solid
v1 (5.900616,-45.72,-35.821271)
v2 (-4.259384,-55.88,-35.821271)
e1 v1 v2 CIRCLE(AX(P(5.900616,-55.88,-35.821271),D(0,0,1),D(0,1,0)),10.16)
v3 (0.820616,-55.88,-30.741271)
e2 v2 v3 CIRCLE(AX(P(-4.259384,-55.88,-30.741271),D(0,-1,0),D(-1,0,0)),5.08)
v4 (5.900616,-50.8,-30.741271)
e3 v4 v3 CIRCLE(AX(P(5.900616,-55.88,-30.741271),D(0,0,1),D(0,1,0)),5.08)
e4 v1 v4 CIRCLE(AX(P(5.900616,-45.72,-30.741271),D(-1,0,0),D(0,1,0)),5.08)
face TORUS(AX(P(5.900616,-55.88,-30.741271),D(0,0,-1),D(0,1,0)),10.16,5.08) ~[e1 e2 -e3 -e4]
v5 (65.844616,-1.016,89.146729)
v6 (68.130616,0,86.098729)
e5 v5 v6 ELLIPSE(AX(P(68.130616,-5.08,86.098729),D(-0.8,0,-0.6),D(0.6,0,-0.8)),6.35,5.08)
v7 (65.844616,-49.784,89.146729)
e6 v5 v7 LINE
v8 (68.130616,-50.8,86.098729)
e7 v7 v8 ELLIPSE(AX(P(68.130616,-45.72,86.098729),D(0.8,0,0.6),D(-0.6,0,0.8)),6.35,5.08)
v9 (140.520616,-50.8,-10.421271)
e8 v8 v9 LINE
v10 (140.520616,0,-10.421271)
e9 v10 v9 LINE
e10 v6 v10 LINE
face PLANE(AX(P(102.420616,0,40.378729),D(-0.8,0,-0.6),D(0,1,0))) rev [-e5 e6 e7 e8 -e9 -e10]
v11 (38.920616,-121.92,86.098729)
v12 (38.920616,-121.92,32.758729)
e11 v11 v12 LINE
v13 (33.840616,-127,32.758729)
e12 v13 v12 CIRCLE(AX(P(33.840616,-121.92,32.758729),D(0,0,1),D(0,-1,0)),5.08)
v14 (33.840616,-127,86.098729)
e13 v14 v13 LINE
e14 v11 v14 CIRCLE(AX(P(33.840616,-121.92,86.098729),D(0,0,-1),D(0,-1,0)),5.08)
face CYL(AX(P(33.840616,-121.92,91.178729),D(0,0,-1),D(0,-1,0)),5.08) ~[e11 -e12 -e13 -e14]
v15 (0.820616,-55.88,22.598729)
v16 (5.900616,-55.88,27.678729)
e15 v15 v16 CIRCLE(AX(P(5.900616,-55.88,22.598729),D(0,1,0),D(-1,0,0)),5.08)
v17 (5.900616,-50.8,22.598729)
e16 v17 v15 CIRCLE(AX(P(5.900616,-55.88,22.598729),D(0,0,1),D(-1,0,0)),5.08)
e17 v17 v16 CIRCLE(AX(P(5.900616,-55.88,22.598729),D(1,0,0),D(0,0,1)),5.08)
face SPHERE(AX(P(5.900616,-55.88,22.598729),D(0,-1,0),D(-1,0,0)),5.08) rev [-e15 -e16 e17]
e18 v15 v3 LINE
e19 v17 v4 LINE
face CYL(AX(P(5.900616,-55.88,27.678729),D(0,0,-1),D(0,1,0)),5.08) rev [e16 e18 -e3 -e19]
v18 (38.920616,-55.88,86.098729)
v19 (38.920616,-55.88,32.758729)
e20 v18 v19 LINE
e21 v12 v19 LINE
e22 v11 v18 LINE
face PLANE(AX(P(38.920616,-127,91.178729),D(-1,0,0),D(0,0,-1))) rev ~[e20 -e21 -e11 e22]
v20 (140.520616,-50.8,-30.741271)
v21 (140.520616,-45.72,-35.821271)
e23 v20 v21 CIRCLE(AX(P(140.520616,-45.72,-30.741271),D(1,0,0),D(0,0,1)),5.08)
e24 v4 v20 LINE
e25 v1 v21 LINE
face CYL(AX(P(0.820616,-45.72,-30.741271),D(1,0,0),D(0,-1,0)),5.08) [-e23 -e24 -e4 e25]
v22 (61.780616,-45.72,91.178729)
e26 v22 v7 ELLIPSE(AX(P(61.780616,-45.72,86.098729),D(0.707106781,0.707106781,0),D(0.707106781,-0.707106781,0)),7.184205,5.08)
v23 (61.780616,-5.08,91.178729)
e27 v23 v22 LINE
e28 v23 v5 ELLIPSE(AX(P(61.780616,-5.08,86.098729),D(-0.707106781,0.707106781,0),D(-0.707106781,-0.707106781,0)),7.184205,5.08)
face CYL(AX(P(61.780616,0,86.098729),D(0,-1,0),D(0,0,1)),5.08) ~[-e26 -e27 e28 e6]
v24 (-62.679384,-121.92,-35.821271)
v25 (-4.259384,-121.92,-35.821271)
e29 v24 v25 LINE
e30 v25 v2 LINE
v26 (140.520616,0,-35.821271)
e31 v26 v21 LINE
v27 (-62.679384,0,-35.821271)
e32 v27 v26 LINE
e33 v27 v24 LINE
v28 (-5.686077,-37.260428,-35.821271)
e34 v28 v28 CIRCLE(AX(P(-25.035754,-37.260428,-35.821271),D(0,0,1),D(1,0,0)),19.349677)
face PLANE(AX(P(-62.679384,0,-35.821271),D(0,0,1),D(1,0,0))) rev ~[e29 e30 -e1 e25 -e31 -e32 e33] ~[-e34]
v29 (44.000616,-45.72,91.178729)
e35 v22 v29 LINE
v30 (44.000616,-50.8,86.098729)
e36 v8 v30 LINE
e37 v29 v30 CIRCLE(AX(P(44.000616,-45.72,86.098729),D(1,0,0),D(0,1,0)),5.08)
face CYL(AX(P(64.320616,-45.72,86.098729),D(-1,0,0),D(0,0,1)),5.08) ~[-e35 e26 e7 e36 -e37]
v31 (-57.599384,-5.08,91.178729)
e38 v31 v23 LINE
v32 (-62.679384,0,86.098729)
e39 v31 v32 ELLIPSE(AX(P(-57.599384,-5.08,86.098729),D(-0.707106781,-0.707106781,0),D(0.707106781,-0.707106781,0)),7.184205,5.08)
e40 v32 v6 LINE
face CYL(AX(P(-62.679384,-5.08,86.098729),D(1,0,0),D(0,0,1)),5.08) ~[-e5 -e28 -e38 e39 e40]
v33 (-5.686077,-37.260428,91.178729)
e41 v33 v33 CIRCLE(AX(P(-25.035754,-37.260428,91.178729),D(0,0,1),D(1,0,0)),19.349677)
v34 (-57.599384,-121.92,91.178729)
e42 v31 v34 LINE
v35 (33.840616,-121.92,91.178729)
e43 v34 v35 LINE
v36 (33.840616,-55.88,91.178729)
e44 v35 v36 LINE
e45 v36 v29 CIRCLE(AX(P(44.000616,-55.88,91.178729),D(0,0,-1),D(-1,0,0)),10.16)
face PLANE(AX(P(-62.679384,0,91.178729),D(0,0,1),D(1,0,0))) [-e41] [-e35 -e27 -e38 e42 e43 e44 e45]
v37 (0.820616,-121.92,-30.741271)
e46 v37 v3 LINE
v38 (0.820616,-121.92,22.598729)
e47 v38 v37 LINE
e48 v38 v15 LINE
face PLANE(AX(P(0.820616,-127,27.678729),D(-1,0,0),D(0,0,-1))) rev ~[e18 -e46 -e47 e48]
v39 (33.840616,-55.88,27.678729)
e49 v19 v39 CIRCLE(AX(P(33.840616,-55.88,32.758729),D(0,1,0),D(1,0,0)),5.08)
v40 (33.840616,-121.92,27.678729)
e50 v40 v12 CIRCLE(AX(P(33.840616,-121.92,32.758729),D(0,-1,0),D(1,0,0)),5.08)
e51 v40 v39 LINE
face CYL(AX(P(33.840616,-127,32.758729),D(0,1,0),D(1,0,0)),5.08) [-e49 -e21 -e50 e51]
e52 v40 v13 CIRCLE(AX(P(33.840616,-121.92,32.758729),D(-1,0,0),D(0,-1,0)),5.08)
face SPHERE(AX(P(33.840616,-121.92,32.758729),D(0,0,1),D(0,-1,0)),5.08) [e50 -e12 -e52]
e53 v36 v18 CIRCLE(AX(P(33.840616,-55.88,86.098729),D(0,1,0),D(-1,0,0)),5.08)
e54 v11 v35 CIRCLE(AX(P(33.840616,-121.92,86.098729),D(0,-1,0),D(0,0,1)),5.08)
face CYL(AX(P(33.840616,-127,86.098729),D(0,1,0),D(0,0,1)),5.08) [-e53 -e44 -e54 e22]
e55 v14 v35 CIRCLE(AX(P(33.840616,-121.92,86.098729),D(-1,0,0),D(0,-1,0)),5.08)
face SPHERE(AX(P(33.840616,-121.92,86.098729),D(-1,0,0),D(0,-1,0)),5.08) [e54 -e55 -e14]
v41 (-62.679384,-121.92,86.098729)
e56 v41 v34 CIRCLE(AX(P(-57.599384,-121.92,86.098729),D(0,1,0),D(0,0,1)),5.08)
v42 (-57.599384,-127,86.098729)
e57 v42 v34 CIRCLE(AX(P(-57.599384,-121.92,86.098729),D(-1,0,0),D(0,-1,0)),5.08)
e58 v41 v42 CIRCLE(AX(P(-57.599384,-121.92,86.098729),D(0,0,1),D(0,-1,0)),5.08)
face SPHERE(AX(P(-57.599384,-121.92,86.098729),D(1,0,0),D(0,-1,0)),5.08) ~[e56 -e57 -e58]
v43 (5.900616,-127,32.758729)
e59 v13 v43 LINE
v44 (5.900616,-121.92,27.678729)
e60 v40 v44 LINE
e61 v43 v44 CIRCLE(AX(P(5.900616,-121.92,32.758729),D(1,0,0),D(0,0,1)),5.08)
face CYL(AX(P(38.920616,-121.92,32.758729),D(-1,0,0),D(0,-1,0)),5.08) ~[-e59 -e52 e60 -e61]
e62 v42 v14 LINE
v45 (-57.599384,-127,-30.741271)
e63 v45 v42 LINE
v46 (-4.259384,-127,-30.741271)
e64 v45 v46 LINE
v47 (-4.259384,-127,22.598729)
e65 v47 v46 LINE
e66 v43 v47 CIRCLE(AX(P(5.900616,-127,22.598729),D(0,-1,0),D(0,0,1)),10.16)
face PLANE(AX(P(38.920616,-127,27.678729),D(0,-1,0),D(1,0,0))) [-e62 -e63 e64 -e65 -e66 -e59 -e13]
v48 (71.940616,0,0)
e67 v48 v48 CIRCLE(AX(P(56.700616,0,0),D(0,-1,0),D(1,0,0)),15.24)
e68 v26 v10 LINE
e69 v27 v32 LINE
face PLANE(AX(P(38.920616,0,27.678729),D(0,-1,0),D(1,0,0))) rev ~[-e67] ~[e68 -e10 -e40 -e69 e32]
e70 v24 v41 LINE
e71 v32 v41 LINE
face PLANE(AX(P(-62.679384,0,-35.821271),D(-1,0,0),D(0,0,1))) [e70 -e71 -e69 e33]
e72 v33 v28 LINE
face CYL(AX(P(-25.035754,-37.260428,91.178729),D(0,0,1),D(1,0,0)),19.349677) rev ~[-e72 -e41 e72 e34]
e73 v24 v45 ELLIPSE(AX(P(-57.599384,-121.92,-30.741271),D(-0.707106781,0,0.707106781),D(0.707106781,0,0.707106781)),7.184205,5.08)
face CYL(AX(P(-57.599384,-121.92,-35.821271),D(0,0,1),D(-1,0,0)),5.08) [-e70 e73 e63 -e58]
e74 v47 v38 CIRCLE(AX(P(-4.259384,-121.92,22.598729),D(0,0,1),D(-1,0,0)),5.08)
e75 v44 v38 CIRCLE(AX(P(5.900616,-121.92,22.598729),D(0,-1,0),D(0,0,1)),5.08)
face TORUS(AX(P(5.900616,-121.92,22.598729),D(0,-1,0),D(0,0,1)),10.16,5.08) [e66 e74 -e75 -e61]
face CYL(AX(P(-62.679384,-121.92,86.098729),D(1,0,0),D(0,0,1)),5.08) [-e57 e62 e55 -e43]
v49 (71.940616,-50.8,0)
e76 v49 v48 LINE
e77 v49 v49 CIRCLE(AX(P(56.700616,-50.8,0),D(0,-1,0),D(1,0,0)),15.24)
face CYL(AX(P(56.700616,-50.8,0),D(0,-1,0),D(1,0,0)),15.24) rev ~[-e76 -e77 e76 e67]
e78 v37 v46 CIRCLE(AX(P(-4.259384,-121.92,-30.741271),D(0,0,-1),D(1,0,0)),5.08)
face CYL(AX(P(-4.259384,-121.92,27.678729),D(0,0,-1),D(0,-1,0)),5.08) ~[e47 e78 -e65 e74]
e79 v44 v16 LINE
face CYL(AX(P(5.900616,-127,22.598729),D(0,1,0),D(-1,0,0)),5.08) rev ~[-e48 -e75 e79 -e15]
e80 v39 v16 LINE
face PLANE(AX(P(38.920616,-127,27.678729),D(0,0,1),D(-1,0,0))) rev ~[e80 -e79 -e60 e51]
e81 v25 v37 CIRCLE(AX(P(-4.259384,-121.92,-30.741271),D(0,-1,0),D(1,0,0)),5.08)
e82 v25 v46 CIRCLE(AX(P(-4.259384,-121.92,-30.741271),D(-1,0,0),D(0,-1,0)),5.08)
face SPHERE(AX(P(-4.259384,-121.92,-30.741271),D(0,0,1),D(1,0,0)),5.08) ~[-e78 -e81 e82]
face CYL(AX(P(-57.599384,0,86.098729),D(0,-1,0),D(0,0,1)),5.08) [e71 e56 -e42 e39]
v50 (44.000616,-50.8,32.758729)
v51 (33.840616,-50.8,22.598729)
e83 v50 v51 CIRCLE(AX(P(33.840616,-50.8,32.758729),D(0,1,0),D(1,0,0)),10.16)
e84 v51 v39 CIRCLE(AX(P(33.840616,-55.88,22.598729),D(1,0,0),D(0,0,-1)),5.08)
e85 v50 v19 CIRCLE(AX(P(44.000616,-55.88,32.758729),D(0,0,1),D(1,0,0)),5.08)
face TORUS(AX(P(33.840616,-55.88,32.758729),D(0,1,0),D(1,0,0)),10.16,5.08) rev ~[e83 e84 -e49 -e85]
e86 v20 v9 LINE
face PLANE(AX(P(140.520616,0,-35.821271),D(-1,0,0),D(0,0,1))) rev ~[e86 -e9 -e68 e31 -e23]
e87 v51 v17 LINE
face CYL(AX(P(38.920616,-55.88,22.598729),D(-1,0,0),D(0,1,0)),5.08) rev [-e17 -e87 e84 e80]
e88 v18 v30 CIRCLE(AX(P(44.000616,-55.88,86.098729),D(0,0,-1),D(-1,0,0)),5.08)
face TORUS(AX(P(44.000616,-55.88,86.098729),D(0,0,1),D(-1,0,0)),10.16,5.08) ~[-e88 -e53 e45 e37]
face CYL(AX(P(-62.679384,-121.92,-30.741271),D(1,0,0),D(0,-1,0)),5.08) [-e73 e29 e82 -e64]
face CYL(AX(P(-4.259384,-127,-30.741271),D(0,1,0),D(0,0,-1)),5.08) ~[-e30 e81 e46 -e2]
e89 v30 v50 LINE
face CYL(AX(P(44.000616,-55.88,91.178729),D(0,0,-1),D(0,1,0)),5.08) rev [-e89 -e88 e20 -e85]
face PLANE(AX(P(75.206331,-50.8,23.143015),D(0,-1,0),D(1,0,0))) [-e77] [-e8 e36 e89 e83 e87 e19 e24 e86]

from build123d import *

# Parameters (mm, degrees)
F0_W     = 203.2
F0_H     = 127
F1_DEPTH = 127
F3_DEPTH = 76.2
F4_SIZE2 = 101.6
F4_SIZE  = 76.2
F5_R     = 5.08
F6_R     = 15.24
F7_DEPTH = 50.8
F8_R     = 19.349676851
F9_DEPTH = 127


with BuildPart() as f1:
    # F0 (on Front) → F1 (new body)
    with BuildSketch(Plane.XZ):
        with Locations((38.9206162602, 27.6787289854)):
            Rectangle(F0_W, F0_H)
    extrude(amount=F1_DEPTH)

    # F2 (on face) → F3 (cut)
    with BuildSketch(Plane.XZ.offset(127)):
        Polygon((38.9206162602, 27.6787289854), (0.8206162602, 27.6787289854), (0.8206162602, -35.8212710146), (140.5206162602, -35.8212710146), (140.5206162602, 91.1787289854), (38.9206162602, 91.1787289854), align=None)
    extrude(amount=-F3_DEPTH, mode=Mode.SUBTRACT)

    # F4
    f4_edges = [f1.edges().sort_by_distance(p)[0] for p in [
        (140.520616, -25.4, 91.178729),
    ]]
    f4_side = f1.faces().sort_by_distance((17.149188, -52.614286, 91.178729))[0]
    chamfer(f4_edges, length=F4_SIZE, length2=F4_SIZE2, reference=f4_side)

    # F5
    f5_edges = [f1.edges().sort_by_distance(p)[0] for p in [
        (-11.879384, -127, 91.178729),
        (38.920616, -127, 59.428729),
        (19.870616, -127, 27.678729),
        (0.820616, -127, -4.071271),
        (38.920616, -88.9, 27.678729),
        (-62.679384, -127, 27.678729),
        (0.820616, -88.9, 27.678729),
        (0.820616, -88.9, -35.821271),
        (0.820616, -50.8, -4.071271),
        (38.920616, -50.8, 59.428729),
        (38.920616, -88.9, 91.178729),
        (0.820616, 0, 91.178729),
        (64.320616, -25.4, 91.178729),
        (-62.679384, -63.5, 91.178729),
        (51.620616, -50.8, 91.178729),
        (-30.929384, -127, -35.821271),
        (70.670616, -50.8, -35.821271),
        (19.870616, -50.8, 27.678729),
    ]]
    fillet(f5_edges, radius=F5_R)

    # F6 (on face) → F7 (cut, through all)
    with BuildSketch(Plane.XZ.offset(50.8)):
        with Locations((56.7006162602, 0)):
            Circle(F6_R)
    extrude(amount=-F7_DEPTH, mode=Mode.SUBTRACT)

    # F8 (on face) → F9 (cut, through all)
    with BuildSketch(Plane.XY.offset(91.1787289854)):
        with Locations((-25.0357538462, -37.260428071)):
            Circle(F8_R)
    extrude(amount=-F9_DEPTH, mode=Mode.SUBTRACT)


solid = f1.part
